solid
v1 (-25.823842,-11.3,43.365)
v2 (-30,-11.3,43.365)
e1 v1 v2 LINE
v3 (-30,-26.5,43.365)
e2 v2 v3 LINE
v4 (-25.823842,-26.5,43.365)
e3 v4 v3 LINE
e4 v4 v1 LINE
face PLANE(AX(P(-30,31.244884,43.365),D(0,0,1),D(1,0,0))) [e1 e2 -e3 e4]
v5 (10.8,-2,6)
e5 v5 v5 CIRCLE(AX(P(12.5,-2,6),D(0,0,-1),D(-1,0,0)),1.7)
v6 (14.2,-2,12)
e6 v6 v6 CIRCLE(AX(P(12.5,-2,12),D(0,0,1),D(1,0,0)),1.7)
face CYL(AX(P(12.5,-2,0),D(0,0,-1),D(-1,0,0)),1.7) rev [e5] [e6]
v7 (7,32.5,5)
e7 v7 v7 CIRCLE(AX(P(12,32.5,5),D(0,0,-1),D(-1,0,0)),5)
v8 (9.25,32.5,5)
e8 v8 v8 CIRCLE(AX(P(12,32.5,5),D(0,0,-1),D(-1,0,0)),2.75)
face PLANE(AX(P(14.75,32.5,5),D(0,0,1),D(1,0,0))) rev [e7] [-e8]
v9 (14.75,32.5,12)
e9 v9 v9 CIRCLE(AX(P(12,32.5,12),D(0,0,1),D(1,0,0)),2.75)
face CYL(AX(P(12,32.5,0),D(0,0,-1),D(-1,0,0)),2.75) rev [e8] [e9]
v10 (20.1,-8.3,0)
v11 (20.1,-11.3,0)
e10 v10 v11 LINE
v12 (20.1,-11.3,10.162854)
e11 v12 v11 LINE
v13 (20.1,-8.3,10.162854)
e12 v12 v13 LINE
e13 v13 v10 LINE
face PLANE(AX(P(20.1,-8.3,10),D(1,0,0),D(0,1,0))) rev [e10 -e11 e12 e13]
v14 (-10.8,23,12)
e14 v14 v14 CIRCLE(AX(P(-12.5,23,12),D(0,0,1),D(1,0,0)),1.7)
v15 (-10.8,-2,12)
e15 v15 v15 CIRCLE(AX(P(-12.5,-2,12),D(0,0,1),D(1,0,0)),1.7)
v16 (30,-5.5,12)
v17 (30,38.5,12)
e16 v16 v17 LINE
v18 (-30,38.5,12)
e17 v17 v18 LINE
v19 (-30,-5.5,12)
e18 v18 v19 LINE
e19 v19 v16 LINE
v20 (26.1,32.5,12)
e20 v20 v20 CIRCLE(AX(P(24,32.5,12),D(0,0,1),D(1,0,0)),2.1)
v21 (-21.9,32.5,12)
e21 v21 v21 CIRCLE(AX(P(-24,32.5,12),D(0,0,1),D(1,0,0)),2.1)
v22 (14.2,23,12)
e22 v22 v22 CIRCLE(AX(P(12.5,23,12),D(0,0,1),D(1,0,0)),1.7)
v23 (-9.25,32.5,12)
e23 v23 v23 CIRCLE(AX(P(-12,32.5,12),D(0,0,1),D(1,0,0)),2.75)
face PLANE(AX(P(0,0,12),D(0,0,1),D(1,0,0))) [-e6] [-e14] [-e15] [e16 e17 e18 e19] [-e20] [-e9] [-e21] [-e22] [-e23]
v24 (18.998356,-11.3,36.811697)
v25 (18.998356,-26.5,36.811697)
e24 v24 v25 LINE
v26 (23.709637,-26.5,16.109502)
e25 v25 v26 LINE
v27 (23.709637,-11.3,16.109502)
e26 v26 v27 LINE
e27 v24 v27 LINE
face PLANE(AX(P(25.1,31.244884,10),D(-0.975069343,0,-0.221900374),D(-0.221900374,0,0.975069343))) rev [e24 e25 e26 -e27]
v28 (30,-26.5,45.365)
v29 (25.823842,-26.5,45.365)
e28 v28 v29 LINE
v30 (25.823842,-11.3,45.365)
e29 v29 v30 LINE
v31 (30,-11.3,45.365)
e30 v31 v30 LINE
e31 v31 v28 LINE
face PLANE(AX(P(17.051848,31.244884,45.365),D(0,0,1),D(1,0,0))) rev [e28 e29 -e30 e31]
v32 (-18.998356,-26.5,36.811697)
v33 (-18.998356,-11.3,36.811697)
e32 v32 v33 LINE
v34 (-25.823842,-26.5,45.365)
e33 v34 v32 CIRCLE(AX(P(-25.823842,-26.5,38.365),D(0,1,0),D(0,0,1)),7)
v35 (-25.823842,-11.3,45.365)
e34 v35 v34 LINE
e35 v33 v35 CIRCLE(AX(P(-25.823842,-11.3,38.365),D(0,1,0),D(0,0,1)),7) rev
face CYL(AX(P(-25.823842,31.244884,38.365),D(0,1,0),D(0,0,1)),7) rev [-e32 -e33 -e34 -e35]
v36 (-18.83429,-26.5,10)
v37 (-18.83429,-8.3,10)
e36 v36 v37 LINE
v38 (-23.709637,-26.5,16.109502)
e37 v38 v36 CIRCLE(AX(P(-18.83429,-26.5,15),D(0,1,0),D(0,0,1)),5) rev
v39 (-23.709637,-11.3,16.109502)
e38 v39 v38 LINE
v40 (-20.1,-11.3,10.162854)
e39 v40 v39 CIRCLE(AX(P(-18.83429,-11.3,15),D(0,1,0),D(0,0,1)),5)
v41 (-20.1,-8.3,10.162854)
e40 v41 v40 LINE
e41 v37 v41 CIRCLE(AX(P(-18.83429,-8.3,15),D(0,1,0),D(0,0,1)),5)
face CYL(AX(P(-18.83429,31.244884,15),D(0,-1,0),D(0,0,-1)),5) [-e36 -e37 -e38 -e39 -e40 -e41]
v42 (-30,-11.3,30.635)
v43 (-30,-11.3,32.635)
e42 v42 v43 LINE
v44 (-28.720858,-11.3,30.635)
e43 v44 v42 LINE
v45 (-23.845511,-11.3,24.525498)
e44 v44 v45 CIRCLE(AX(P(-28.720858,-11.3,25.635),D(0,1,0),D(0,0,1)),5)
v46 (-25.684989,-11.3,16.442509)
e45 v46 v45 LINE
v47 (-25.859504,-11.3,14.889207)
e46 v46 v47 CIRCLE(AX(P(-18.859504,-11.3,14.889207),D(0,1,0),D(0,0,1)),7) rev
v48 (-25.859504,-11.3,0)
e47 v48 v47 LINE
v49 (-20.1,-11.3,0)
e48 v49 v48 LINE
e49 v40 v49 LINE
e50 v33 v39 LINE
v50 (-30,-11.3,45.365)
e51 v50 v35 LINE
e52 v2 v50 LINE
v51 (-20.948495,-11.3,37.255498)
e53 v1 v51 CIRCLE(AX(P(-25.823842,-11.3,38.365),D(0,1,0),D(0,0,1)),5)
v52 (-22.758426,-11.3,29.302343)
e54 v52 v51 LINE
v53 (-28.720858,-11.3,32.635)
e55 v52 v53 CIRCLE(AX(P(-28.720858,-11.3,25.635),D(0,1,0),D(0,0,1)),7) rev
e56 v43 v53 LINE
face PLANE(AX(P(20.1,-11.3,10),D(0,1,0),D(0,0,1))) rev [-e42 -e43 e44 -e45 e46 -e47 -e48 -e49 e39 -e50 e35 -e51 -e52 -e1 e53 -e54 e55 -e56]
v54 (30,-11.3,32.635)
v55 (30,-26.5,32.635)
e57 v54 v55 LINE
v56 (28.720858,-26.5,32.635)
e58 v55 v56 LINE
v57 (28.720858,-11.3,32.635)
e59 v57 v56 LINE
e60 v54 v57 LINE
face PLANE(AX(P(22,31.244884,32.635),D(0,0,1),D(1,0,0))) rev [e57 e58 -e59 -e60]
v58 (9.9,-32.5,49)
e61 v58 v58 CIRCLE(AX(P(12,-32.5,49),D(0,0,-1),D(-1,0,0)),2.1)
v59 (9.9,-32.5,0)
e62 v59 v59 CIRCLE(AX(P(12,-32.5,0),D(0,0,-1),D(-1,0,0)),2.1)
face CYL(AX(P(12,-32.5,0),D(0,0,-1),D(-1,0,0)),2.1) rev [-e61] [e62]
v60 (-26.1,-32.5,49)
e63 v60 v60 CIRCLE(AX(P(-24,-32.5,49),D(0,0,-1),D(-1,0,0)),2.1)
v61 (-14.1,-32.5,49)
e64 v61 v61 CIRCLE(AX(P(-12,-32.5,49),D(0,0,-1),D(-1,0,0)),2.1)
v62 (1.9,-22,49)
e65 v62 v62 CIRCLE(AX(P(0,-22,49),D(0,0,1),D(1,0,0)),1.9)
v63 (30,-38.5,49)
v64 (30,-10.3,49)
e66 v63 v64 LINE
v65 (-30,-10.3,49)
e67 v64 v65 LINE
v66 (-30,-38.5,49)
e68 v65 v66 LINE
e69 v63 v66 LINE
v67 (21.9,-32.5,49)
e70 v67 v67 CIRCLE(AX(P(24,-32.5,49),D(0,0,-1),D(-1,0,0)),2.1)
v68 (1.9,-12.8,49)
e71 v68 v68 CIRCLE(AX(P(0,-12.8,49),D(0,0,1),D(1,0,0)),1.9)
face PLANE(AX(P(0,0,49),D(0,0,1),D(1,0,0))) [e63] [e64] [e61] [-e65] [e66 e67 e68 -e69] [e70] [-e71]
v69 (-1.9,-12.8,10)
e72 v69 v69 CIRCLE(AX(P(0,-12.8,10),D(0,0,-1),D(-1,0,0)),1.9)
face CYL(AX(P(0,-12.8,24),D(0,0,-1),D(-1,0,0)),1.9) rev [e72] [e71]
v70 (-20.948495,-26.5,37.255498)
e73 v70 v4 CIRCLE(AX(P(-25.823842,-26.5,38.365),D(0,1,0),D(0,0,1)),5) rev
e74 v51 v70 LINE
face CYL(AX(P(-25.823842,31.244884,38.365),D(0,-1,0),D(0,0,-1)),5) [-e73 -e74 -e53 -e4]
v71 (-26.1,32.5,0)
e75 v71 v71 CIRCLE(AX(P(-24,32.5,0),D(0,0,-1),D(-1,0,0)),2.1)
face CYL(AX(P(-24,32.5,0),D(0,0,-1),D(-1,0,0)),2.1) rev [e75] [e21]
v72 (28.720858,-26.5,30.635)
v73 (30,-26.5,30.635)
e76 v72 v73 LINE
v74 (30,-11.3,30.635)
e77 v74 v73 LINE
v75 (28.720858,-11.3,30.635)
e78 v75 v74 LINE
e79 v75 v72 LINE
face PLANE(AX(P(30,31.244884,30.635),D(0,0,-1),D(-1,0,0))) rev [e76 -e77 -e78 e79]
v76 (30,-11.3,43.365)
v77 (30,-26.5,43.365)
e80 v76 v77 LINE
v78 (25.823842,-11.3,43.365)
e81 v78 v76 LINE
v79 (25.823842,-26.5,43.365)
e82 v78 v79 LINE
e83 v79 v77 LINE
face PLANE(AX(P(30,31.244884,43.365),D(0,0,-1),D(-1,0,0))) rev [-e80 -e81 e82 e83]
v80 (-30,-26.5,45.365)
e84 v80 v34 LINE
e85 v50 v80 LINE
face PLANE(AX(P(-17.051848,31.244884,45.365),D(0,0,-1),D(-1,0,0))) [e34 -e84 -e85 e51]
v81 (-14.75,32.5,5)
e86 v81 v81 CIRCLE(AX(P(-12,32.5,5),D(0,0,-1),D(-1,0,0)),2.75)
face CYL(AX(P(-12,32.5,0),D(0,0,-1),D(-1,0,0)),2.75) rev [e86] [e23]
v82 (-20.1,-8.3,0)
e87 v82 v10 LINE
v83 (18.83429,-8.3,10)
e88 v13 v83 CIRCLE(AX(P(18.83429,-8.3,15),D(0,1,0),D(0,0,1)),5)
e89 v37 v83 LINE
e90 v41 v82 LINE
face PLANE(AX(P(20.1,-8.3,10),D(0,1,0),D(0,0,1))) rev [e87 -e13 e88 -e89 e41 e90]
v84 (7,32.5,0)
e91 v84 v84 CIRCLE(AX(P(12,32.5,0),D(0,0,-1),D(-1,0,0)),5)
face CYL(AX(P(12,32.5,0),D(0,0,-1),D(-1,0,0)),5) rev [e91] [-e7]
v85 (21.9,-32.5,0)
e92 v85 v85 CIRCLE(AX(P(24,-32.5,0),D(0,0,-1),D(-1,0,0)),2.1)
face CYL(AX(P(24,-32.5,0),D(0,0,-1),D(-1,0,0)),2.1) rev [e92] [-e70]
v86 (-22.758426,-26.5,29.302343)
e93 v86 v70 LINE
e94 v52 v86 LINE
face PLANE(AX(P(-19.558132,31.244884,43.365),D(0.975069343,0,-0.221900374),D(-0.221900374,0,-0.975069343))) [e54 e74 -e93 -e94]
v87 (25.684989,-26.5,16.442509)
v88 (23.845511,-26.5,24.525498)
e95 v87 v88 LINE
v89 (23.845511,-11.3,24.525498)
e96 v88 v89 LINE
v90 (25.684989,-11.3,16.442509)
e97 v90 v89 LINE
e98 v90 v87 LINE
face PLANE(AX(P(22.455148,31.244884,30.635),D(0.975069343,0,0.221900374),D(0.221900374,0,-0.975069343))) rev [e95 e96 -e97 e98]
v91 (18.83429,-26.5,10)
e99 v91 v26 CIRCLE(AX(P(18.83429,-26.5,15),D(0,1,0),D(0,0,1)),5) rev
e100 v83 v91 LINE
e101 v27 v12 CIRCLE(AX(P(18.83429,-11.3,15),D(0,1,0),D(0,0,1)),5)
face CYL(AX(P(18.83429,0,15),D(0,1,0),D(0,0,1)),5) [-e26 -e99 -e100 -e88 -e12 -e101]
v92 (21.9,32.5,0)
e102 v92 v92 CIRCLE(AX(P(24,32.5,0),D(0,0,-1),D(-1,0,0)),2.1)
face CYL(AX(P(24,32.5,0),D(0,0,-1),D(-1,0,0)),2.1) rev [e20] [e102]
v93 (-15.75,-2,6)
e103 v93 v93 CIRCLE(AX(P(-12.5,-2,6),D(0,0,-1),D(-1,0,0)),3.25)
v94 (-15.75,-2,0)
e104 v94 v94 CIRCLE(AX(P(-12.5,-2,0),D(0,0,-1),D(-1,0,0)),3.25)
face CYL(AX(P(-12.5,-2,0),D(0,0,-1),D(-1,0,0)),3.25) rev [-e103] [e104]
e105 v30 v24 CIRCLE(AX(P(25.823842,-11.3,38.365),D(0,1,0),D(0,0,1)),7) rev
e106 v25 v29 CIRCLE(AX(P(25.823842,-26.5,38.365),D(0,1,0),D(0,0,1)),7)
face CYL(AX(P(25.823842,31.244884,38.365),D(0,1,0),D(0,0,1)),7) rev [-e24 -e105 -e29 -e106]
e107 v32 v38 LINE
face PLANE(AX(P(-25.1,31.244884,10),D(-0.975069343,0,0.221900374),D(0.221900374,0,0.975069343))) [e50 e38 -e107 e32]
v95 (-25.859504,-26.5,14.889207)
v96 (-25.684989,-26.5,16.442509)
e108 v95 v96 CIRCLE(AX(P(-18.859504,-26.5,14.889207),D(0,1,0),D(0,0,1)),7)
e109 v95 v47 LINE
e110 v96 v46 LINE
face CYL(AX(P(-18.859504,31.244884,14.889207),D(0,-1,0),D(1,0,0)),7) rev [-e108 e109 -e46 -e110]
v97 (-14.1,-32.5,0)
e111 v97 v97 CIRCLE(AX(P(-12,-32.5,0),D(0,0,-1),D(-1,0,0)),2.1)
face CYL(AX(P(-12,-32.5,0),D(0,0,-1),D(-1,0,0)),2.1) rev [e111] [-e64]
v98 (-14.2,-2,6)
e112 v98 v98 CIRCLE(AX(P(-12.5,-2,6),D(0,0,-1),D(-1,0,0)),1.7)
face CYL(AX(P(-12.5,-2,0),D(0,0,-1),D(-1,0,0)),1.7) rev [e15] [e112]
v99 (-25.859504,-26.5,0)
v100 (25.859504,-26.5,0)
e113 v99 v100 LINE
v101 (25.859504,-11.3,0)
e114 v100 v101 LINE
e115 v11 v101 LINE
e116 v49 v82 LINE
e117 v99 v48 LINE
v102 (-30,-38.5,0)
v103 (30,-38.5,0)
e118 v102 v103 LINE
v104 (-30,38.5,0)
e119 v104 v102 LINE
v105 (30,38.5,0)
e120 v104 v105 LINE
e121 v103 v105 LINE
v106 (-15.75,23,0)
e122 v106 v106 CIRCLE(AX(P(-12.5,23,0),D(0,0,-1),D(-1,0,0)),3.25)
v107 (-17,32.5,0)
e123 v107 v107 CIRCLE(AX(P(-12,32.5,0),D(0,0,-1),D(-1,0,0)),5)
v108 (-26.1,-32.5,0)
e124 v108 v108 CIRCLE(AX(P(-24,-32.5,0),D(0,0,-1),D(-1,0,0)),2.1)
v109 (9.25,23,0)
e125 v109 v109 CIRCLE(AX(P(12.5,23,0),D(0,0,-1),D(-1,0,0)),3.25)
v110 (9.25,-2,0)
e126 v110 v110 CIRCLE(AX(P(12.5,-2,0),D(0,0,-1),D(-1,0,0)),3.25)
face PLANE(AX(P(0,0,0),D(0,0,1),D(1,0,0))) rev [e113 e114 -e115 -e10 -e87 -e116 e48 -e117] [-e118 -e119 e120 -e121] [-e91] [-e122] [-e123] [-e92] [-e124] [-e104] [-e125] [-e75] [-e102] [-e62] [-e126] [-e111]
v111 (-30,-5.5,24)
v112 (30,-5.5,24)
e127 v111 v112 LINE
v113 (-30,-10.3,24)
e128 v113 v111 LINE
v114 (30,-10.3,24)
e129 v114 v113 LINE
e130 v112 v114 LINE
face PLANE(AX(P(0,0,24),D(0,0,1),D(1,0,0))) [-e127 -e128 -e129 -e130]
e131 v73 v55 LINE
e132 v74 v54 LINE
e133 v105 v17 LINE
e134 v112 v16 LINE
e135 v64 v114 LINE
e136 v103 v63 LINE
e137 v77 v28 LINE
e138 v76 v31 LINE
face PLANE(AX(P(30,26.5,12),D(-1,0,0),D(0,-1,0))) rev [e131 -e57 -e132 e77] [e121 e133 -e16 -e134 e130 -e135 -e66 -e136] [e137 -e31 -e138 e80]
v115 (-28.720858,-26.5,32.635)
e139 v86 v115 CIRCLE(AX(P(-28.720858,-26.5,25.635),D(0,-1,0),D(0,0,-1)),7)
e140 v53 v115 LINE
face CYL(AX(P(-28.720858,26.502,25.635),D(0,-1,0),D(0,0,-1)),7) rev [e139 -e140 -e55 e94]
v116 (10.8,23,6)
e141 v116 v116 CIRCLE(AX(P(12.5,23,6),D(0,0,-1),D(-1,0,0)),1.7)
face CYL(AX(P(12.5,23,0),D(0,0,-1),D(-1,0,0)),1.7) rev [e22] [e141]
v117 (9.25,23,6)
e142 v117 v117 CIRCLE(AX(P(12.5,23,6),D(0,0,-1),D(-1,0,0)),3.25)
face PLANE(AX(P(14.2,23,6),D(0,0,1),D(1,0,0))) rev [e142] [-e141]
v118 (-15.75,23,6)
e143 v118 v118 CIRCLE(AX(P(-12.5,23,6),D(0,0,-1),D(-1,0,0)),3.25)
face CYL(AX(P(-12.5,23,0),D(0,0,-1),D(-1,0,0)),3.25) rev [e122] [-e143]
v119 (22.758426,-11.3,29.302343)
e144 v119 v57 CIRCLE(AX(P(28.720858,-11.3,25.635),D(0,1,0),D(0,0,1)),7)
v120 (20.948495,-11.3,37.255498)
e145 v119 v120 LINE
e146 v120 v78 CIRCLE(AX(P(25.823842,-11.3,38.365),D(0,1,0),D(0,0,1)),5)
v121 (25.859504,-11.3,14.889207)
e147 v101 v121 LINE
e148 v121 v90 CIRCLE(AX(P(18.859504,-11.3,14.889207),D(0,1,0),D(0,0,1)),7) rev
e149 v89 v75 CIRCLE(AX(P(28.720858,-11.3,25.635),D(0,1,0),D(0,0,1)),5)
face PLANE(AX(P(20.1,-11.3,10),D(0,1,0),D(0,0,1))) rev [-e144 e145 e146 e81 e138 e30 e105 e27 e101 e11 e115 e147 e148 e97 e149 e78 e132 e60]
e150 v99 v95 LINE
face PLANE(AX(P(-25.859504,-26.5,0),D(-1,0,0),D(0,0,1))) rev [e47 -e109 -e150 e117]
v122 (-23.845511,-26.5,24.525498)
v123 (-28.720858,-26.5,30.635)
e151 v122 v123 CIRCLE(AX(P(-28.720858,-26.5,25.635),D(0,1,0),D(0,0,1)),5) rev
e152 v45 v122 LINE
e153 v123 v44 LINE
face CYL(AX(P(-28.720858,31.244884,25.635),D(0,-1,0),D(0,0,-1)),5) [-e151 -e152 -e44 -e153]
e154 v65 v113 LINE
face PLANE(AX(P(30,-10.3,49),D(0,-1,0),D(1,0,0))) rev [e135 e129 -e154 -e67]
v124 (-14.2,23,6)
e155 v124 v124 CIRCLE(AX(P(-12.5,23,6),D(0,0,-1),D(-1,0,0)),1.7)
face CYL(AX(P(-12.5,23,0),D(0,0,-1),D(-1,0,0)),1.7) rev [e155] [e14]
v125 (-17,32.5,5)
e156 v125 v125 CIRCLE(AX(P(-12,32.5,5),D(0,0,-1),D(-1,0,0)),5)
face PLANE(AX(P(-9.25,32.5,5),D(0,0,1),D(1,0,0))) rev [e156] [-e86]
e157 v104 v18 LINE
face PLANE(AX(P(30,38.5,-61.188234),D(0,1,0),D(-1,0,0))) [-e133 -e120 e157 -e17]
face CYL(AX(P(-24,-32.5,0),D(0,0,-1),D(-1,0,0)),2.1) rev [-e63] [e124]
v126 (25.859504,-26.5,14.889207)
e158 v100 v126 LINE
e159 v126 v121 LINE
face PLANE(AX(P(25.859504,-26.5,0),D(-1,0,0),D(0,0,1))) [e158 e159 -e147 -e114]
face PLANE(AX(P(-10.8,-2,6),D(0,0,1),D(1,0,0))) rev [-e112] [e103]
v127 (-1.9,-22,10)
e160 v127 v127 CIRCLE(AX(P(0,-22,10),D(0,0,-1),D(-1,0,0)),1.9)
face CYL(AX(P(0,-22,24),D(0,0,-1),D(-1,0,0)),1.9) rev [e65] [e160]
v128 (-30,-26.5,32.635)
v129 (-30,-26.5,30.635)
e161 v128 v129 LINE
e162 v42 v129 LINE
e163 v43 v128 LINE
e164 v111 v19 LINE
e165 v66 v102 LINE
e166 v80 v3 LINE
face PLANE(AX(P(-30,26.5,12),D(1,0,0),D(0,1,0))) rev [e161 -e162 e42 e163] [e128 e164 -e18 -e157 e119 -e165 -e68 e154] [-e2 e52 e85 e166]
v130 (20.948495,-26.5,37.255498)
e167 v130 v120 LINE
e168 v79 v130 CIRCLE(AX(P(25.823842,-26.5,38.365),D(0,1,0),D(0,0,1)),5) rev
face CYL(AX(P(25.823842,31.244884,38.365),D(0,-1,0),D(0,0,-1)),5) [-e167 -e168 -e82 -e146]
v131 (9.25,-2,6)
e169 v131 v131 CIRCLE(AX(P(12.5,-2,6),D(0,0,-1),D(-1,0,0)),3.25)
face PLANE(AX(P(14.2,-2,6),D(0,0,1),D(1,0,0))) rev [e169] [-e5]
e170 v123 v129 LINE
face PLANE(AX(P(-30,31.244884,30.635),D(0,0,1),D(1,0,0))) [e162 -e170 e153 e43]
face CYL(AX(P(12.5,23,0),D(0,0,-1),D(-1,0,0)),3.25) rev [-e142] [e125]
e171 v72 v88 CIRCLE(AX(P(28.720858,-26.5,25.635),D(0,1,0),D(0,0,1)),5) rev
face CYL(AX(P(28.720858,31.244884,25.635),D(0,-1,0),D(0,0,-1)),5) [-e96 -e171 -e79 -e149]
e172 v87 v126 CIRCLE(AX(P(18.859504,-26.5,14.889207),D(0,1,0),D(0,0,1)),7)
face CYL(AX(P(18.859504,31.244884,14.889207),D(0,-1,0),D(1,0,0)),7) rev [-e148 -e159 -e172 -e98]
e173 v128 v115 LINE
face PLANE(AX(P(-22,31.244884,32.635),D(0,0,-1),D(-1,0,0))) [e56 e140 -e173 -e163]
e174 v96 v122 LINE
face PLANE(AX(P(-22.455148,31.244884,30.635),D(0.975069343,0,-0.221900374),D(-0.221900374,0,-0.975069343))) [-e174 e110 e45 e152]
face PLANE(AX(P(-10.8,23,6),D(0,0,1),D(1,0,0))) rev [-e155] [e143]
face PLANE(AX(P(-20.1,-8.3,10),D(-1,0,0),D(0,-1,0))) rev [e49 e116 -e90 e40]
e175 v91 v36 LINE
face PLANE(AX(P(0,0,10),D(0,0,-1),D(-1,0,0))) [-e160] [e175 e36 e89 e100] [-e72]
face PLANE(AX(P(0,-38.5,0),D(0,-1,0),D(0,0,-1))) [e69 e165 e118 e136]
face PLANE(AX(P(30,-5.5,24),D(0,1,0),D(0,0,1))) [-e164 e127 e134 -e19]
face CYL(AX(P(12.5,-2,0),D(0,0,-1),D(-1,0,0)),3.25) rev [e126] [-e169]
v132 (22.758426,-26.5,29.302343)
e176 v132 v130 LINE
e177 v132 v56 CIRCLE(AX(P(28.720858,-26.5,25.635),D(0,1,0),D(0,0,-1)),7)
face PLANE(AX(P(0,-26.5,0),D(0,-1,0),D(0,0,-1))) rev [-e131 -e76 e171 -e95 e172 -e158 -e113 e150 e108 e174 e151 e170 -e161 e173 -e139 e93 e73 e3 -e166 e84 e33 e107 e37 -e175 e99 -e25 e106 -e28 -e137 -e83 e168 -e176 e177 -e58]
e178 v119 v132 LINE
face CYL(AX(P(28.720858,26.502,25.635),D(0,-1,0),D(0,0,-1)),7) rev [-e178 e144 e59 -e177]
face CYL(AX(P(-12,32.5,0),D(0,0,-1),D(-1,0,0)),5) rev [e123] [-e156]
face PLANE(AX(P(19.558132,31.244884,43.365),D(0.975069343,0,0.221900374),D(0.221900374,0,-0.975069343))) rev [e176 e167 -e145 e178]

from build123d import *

# Parameters (mm, degrees)
SKETCH1_W                      = 60
SKETCH1_H                      = 53
BOSS_EXTRUDE1_DEPTH            = 12
SKETCH2_W                      = 60
SKETCH2_H                      = 21
BOSS_EXTRUDE2_DEPTH            = 12
SKETCH4_W                      = 40.2
SKETCH4_H                      = 18.2
CUT_EXTRUDE1_DEPTH             = 10
SKETCH5_R                      = 1.9
CUT_EXTRUDE2_DEPTH             = 43.405777908
SKETCH8_W                      = 60
SKETCH8_H                      = 16.2
SKETCH8_R                      = 1.9
BOSS_EXTRUDE3_DEPTH            = 25
CUT_EXTRUDE3_DEPTH             = 15.2
FILLET1_R                      = 5
FILLET2_R                      = 7
BOSS_EXTRUDE5_REACH            = 80.166
CUT_EXTRUDE4_DEPTH             = 69.773832233
MIRROR1_START                  = -26.5
MIRROR1_DEPTH                  = 15.2
MIRROR1_START_2                = -11.3
MIRROR1_2_DEPTH                = 3
SKETCH10_W                     = 60
SKETCH10_H                     = 49
BOSS_EXTRUDE4_DEPTH            = 12
SKETCH16_W                     = 60
SKETCH16_H                     = 12
BOSS_EXTRUDE6_DEPTH            = 12
M5X0_8_TAPPED_HOLE1_D          = 4.2
CBORE_FOR_M3_SHCS1_D           = 3.4
CBORE_FOR_M3_SHCS1_CBORE_D     = 6.5
CBORE_FOR_M3_SHCS1_CBORE_DEPTH = 6
CBORE_FOR_M5_SHCS1_D           = 5.5
CBORE_FOR_M5_SHCS1_CBORE_D     = 10
CBORE_FOR_M5_SHCS1_CBORE_DEPTH = 5


# Read off the part's stored shape, not the designer's step: Mirror1
with BuildPart() as part:
    # Sketch1 → Boss-Extrude1 (new body)
    with BuildSketch(Plane.XY):
        Rectangle(SKETCH1_W, SKETCH1_H)
    extrude(amount=BOSS_EXTRUDE1_DEPTH)

    # Sketch2 → Boss-Extrude2 (add)
    with BuildSketch(Plane(origin=(0, 0, 12), x_dir=(-1, 0, 0), z_dir=(0, 0, -1))):
        with Locations((0, -16)):
            Rectangle(SKETCH2_W, SKETCH2_H)
    extrude(amount=-BOSS_EXTRUDE2_DEPTH)

    # Sketch4 → Cut-Extrude1 (cut)
    with BuildSketch(Plane(origin=(0, 0, 0), x_dir=(-1, 0, 0), z_dir=(0, 0, -1))):
        with Locations((0, -17.4)):
            Rectangle(SKETCH4_W, SKETCH4_H)
    extrude(amount=-CUT_EXTRUDE1_DEPTH, mode=Mode.SUBTRACT)

    # Sketch5 → Cut-Extrude2 (cut, through all)
    with BuildSketch(Plane(origin=(0, 0, 10), x_dir=(-1, 0, 0), z_dir=(0, 0, -1))):
        with Locations((0, -12.8)):
            Circle(SKETCH5_R)
        with Locations((0, -22)):
            Circle(SKETCH5_R)
    extrude(amount=-CUT_EXTRUDE2_DEPTH, mode=Mode.SUBTRACT)

    # Sketch8 → Boss-Extrude3 (add)
    with BuildSketch(Plane.XY.offset(24)):
        with Locations((0, -18.4)):
            Rectangle(SKETCH8_W, SKETCH8_H)
        with Locations(Location((0, -22, 0), (0, 0, 180))):
            Circle(SKETCH8_R, mode=Mode.SUBTRACT)
        with Locations(Location((0, -12.8, 0), (0, 0, 180))):
            Circle(SKETCH8_R, mode=Mode.SUBTRACT)
    extrude(amount=BOSS_EXTRUDE3_DEPTH)

    # Sketch9 → Cut-Extrude3 (cut)
    with BuildSketch(Plane.XZ.offset(26.5)):
        Polygon((20.1, 10), (25.1, 10), (17.051847549, 45.365), (30, 45.365), (30, 43.365), (19.558131605, 43.365), (22, 32.635), (30, 32.635), (30, 30.635), (22.455147884, 30.635), (27.606284055, 8), (20.1, 8), align=None)
    extrude(amount=-CUT_EXTRUDE3_DEPTH, mode=Mode.SUBTRACT)

    # Fillet1
    fillet1_edges = [part.edges().sort_by_distance(p)[0] for p in [
        (19.558131605, -18.9, 43.365),
        (22.455147884, -18.9, 30.635),
        (25.1, -18.9, 10),
    ]]
    fillet(fillet1_edges, radius=FILLET1_R)

    # Fillet2
    # the kernel refuses this fillet: 7 mm, written as the material it adds along each edge
    with BuildSketch(Plane(origin=(27.606284055, -26.5, 8), x_dir=(-1, 0, 0), z_dir=(0, 1, 0))) as fillet2_piece_1:
        with BuildLine():
            CenterArc((8.746780519, 6.889206669), FILLET2_R, 167.179324342, 92.613163385)
            Line((1.921295117, 8.442509286), (1.784785409, 8.473575339))
            Line((1.784785409, 8.473575339), (-0.136509708, 0.031066052))
            Line((-0.136509708, 0.031066052), (0, -0.14))
            ThreePointArc((0, -0.14), (3.753142028, -0.14), (7.481474126, -0.137784133))
            Line((7.481474126, -0.137784133), (7.506284055, 0))
        make_face()
    extrude(amount=15.2)
    with BuildSketch(Plane(origin=(17.051847549, -26.5, 45.365), x_dir=(0.22190037393070375, 0, -0.9750693432004792), z_dir=(0, 1, 0))) as fillet2_piece_2:
        with BuildLine():
            CenterArc((FILLET2_R * 1.25314202775, -FILLET2_R), FILLET2_R, 90, 102.820675658)
            Line((FILLET2_R * 0.278072684545, -FILLET2_R * 1.22190037393), (FILLET2_R * 0.258571297681, -FILLET2_R * 1.22633838141))
            Line((FILLET2_R * 0.258571297681, -FILLET2_R * 1.22633838141), (-FILLET2_R * 0.0250628405549, FILLET2_R * 0.02))
            Line((-FILLET2_R * 0.0250628405549, FILLET2_R * 0.02), (FILLET2_R * 1.25314202775, FILLET2_R * 0.02))
            Line((FILLET2_R * 1.25314202775, FILLET2_R * 0.02), (FILLET2_R * 1.25314202775, 0))
        make_face()
    extrude(amount=15.2)

    # Sketch14 → Boss-Extrude5 (add, up to next)
    with BuildSketch(Plane.XZ.offset(26.5), mode=Mode.PRIVATE) as boss_extrude5_sk1:
        with BuildLine():
            Line((22, 32.635), (22.758425927, 29.30234284))
            ThreePointArc((22.758425927, 29.30234284), (25.30555422, 31.745294587), (28.720858022, 32.635))
            Line((28.720858022, 32.635), (22, 32.635))
        make_face()
    boss_extrude5_tool1 = extrude(boss_extrude5_sk1.sketch, amount=-BOSS_EXTRUDE5_REACH, mode=Mode.PRIVATE) - part.part
    add(boss_extrude5_tool1.solids().sort_by_distance((23.8726, -26.5, 31.664798))[0])

    # Sketch15 → Cut-Extrude4 (cut, through all)
    with BuildSketch(Plane.XZ.offset(11.3)):
        with BuildLine():
            Line((25.684988939, 16.442509286), (23.709636577, 16.10950187))
            ThreePointArc((23.709636577, 16.10950187), (23.108491418, 12.40554417), (20.1, 10.16285437))
            Line((20.1, 10.16285437), (20.1, 0))
            Line((20.1, 0), (25.859503536, 0))
            Line((25.859503536, 0), (25.859503536, 14.889206669))
            ThreePointArc((25.859503536, 14.889206669), (25.815738072, 15.670744314), (25.684988939, 16.442509286))
        make_face()
    extrude(amount=CUT_EXTRUDE4_DEPTH, mode=Mode.SUBTRACT)

    # Mirror1 outline → Mirror1 (cut)
    with BuildSketch(Plane(origin=(0, 0, 0), x_dir=(1, 0, 0), z_dir=(0, 1, 0)).offset(MIRROR1_START)):
        with BuildLine():
            Line((-30, -32.635), (-28.720858022, -32.635))
            ThreePointArc((-28.720858022, -32.635), (-25.30555422, -31.745294587), (-22.758425927, -29.30234284))
            Line((-22.758425927, -29.30234284), (-20.948495028, -37.25549813))
            ThreePointArc((-20.948495028, -37.25549813), (-21.915676615, -41.483692887), (-25.823841744, -43.365))
            Line((-25.823841744, -43.365), (-30, -43.365))
            Line((-30, -43.365), (-30, -45.365))
            Line((-30, -45.365), (-25.823841744, -45.365))
            ThreePointArc((-25.823841744, -45.365), (-20.352410563, -42.731170042), (-18.998356341, -36.811697382))
            Line((-18.998356341, -36.811697382), (-23.709636577, -16.10950187))
            ThreePointArc((-23.709636577, -16.10950187), (-22.74245499, -11.881307113), (-18.834289861, -10))
            Line((-18.834289861, -10), (-20.1, -10))
            Line((-20.1, -10), (-20.1, 0))
            Line((-20.1, 0), (-25.859503536, 0))
            Line((-25.859503536, 0), (-25.859503536, -14.889206669))
            ThreePointArc((-25.859503536, -14.889206669), (-25.815738072, -15.670744314), (-25.684988939, -16.442509286))
            Line((-25.684988939, -16.442509286), (-23.845511306, -24.52549813))
            ThreePointArc((-23.845511306, -24.52549813), (-24.812692893, -28.753692887), (-28.720858022, -30.635))
            Line((-28.720858022, -30.635), (-30, -30.635))
            Line((-30, -30.635), (-30, -32.635))
        make_face()
    extrude(amount=MIRROR1_DEPTH, mode=Mode.SUBTRACT)

    # Mirror1 2 outline → Mirror1 2 (cut)
    with BuildSketch(Plane(origin=(0, 0, 0), x_dir=(1, 0, 0), z_dir=(0, 1, 0)).offset(MIRROR1_START_2)):
        with BuildLine():
            Line((-18.834289861, -10), (-20.1, -10))
            Line((-20.1, -10), (-20.1, -10.16285437))
            ThreePointArc((-20.1, -10.16285437), (-19.472361899, -10.040880716), (-18.834289861, -10))
        make_face()
    extrude(amount=MIRROR1_2_DEPTH, mode=Mode.SUBTRACT)

    # Sketch10 → Boss-Extrude4 (add)
    with BuildSketch(Plane.XZ.offset(26.5)):
        with Locations((0, 24.5)):
            Rectangle(SKETCH10_W, SKETCH10_H)
    extrude(amount=BOSS_EXTRUDE4_DEPTH)

    # Sketch16 → Boss-Extrude6 (add)
    with BuildSketch(Plane.XY.offset(12)):
        with Locations((0, 32.5)):
            Rectangle(SKETCH16_W, SKETCH16_H)
    extrude(amount=-BOSS_EXTRUDE6_DEPTH)

    # M5x0.8 Tapped Hole1 (through all)
    with Locations(Plane(origin=(0, 0, 0), x_dir=(-1, 0, 0), z_dir=(0, 0, -1))):
        with Locations((-24, 32.5), (-24, -32.5), (24, -32.5), (24, 32.5), (-12, -32.5), (12, -32.5)):
            Hole(M5X0_8_TAPPED_HOLE1_D / 2)

    # CBORE for M3 SHCS1 (through all)
    with Locations(Plane(origin=(0, 0, 0), x_dir=(-1, 0, 0), z_dir=(0, 0, -1))):
        with Locations((12.5, -2), (-12.5, -2), (-12.5, 23), (12.5, 23)):
            CounterBoreHole(CBORE_FOR_M3_SHCS1_D / 2, CBORE_FOR_M3_SHCS1_CBORE_D / 2, CBORE_FOR_M3_SHCS1_CBORE_DEPTH)

    # CBORE for M5 SHCS1 (through all)
    with Locations(Plane(origin=(0, 0, 0), x_dir=(-1, 0, 0), z_dir=(0, 0, -1))):
        with Locations((-12, 32.5), (12, 32.5)):
            CounterBoreHole(CBORE_FOR_M5_SHCS1_D / 2, CBORE_FOR_M5_SHCS1_CBORE_D / 2, CBORE_FOR_M5_SHCS1_CBORE_DEPTH)


solid = part.part
